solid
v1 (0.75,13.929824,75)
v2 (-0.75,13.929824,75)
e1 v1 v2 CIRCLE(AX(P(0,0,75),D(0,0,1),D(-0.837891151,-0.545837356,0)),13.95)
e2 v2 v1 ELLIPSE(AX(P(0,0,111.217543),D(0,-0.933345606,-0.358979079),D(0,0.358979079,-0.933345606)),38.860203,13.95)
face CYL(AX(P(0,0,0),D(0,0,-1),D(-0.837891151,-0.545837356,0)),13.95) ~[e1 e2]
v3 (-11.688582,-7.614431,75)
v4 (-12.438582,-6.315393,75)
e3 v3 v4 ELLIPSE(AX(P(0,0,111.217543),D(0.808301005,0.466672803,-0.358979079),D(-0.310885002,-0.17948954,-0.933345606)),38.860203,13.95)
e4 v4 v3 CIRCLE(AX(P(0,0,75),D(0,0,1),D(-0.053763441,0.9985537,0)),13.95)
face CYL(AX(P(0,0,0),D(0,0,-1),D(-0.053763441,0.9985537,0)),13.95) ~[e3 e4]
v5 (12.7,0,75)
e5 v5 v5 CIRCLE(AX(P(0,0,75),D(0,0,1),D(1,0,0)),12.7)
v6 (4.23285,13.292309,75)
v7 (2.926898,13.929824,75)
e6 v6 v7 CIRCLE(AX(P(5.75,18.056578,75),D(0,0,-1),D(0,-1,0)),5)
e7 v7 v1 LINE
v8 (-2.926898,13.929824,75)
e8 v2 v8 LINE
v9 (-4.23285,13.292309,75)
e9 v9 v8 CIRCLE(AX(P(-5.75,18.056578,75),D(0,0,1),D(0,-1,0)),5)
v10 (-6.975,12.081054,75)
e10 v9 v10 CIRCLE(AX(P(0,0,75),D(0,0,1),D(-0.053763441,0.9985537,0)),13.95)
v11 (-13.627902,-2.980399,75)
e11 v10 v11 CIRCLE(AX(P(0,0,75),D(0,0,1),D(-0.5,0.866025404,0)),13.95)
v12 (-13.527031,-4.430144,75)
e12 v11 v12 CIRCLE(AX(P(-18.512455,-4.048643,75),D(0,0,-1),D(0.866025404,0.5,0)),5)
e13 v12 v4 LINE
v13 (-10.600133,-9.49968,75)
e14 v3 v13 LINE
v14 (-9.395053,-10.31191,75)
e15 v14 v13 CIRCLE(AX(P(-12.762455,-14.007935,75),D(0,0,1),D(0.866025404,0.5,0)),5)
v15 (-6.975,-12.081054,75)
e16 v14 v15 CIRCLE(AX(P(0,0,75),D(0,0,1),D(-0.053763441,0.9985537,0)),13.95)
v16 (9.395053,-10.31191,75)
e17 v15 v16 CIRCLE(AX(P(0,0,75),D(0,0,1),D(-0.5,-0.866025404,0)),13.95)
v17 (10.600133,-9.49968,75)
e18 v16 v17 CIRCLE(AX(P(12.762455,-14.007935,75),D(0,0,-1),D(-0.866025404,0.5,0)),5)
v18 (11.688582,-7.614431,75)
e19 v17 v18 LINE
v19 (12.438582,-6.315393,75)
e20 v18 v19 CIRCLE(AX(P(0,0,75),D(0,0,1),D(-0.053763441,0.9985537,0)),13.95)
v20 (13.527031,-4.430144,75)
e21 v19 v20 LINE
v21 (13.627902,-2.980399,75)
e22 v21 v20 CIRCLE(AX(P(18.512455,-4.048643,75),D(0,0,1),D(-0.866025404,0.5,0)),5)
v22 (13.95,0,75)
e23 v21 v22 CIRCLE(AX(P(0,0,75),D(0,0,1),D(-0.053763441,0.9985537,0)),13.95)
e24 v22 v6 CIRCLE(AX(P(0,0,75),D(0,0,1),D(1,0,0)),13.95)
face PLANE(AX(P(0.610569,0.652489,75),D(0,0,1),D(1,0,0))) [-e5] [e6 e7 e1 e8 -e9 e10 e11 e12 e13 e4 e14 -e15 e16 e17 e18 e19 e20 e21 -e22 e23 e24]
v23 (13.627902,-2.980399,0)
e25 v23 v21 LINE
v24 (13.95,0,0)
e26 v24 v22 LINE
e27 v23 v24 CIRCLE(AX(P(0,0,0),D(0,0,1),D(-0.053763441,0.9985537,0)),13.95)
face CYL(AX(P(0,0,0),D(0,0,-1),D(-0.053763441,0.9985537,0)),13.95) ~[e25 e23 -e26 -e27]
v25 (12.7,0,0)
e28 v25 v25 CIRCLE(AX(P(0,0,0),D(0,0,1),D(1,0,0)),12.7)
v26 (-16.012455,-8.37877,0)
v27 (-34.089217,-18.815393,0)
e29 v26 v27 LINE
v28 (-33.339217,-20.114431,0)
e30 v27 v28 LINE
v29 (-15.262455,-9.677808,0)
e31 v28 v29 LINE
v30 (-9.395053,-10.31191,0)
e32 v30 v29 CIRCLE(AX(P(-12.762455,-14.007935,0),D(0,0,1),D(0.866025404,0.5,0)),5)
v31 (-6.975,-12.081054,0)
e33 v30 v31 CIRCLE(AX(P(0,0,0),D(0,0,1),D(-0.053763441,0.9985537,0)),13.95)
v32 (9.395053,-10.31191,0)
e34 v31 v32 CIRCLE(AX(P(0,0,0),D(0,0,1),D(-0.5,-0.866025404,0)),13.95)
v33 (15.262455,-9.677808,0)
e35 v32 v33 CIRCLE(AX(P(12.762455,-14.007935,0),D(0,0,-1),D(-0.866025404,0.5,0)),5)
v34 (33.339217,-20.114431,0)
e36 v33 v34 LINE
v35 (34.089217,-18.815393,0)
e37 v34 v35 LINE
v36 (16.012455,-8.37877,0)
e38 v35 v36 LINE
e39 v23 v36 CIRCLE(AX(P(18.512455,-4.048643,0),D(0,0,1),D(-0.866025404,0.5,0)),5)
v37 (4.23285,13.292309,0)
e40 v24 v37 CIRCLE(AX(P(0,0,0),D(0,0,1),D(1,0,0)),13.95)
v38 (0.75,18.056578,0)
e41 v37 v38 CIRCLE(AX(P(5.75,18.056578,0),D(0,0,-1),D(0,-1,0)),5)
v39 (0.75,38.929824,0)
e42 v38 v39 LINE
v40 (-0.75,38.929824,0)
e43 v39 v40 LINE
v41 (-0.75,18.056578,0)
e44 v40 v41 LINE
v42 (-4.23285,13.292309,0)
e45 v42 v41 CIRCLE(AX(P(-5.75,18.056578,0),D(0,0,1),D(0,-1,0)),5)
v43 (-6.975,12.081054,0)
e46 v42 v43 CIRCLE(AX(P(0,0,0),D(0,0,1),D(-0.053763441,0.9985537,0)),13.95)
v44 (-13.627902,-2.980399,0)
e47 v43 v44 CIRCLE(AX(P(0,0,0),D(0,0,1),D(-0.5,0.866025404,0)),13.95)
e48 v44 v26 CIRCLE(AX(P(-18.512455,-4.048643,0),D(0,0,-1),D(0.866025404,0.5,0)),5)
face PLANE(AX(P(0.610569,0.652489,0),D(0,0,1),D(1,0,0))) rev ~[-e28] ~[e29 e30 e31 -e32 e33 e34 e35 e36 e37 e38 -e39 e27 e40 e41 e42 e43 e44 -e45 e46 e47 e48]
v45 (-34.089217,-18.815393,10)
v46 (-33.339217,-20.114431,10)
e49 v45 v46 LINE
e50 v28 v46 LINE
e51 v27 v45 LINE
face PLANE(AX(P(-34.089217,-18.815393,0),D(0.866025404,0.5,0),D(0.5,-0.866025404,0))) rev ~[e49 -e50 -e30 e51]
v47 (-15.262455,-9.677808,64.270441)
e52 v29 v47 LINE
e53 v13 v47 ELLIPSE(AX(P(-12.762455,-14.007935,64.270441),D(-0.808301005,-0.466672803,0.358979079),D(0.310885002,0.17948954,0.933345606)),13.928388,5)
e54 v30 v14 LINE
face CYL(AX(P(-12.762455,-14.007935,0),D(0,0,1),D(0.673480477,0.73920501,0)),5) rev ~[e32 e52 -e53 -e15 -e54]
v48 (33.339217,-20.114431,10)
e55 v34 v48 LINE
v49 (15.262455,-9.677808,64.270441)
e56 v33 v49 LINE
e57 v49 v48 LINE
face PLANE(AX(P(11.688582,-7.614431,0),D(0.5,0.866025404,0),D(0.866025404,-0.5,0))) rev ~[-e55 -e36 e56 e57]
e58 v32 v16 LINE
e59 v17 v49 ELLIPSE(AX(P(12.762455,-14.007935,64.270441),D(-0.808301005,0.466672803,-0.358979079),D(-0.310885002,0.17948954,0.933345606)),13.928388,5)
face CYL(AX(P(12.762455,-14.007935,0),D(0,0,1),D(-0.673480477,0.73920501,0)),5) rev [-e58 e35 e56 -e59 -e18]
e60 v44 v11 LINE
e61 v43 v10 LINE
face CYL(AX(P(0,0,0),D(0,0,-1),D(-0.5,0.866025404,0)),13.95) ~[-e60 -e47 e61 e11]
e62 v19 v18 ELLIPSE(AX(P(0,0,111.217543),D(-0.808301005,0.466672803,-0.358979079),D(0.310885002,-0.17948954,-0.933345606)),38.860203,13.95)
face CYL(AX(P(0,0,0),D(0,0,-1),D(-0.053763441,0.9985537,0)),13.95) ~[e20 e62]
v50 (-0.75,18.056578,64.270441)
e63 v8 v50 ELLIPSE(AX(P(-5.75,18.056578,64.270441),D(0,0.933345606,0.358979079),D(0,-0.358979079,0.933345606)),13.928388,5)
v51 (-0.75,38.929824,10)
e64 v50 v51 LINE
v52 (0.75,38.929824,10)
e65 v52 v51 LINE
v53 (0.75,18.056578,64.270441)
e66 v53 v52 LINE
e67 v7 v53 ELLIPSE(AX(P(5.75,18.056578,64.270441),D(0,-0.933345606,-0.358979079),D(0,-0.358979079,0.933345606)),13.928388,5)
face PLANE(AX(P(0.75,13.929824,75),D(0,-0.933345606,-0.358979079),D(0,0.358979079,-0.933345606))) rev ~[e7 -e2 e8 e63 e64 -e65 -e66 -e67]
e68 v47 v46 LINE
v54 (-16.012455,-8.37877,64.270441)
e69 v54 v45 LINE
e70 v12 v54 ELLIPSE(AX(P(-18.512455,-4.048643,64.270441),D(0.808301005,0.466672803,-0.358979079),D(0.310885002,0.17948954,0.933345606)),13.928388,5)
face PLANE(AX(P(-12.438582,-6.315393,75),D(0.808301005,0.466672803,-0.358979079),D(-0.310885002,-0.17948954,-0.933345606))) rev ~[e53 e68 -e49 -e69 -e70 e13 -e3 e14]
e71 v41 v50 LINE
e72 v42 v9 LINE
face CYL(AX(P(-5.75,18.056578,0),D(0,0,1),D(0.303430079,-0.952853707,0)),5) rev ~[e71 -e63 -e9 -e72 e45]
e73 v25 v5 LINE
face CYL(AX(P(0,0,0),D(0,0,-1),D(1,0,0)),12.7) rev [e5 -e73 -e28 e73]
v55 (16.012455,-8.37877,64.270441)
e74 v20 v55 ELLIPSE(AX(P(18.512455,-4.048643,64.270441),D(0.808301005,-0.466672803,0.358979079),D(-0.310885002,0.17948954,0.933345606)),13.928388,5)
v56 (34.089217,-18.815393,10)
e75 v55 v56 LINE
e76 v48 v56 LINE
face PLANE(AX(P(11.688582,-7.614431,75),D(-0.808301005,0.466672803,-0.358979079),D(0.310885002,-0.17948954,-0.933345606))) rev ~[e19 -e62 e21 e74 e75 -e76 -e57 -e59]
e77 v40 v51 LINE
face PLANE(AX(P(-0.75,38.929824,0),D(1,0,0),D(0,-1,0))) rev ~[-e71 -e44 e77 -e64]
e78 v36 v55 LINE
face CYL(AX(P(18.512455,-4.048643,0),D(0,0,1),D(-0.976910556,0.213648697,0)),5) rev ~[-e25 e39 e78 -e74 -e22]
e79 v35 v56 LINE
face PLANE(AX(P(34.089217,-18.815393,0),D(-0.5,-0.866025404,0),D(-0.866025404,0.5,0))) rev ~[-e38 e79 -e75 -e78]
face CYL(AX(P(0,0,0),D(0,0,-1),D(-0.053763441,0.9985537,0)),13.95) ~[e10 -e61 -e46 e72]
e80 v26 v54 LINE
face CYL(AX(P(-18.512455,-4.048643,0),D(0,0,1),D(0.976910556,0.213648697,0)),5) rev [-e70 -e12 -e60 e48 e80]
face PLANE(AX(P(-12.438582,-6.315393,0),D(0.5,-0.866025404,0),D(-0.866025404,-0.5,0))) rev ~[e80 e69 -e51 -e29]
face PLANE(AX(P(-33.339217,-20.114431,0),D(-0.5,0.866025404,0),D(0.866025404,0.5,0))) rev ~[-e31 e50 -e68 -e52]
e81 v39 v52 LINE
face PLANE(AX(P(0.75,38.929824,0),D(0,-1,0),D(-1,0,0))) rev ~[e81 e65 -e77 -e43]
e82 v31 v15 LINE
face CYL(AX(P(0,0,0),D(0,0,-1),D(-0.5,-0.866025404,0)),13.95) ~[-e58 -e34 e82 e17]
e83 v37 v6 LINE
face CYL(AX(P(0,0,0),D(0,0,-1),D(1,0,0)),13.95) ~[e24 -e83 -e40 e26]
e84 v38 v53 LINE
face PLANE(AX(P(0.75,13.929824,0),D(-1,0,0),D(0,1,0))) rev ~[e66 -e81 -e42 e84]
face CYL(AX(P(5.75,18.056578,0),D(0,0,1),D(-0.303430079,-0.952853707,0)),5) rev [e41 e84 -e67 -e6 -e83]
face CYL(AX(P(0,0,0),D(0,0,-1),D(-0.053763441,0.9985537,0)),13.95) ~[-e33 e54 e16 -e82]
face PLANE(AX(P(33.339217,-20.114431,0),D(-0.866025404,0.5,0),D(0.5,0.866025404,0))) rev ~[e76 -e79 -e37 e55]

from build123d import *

# Parameters (mm, degrees)
F0_R     = 12.7
F1_DEPTH = 75
F3_DEPTH = 1.5
F4_R     = 5
F6_COUNT = 3
F6_ANGLE = 240


# Not quite as in the source:
# - a feature names something its author has since deleted; it is built from what else it names


with BuildPart() as f1:
    # F0 (on Top) → F1 (new body)
    with BuildSketch(Plane.XY):
        with BuildLine():
            ThreePointArc((-0.75, 13.9298241195), (-9.595311355, -10.125833299), (13.95, 0))
            ThreePointArc((13.95, 0), (10.125833299, 9.595311355), (0.75, 13.9298241195))
            ThreePointArc((0.75, 13.9298241195), (0, 13.95), (-0.75, 13.9298241195))
        make_face()
        Circle(F0_R, mode=Mode.SUBTRACT)
        with BuildLine():
            ThreePointArc((-0.75, 13.9298241195), (0, 13.95), (0.75, 13.9298241195))
            Line((0.75, 13.9298241195), (0.75, 38.9298241195))
            Line((0.75, 38.9298241195), (0, 38.9298241195))
            Line((0, 38.9298241195), (-0.75, 38.9298241195))
            Line((-0.75, 38.9298241195), (-0.75, 13.9298241195))
        make_face()
    extrude(amount=F1_DEPTH)

    # F2 (on face) → F3 (cut, through all)
    with BuildSketch(Plane.YZ.offset(0.75)):
        Polygon((38.9298241195, 75), (13.9298241195, 75), (38.9298241195, 10), align=None)
    extrude(amount=-F3_DEPTH, mode=Mode.SUBTRACT)

    # F4 (call 1 of 2: OpenCascade refuses the feature's edges together)
    f4_edges = [f1.edges().sort_by_distance(p)[0] for p in [
        (0.75, 13.929824, 37.5),
    ]]
    fillet(f4_edges, radius=F4_R)

    # F4#2 (call 2 of 2)
    f4_2_edges = [f1.edges().sort_by_distance(p)[0] for p in [
        (-0.75, 13.929824, 37.5),
    ]]
    fillet(f4_2_edges, radius=F4_R)

    # F6: F1 ×3 about axis
    f6_axis = Axis((0, 0, 42.7156351507), (0, 0, 1))


with BuildPart() as f1_1:
    add(f1.part)
    for i in range(1, F6_COUNT):
        add(f1.part.rotate(f6_axis, i * F6_ANGLE / (F6_COUNT - 1)))


solid = f1_1.part
